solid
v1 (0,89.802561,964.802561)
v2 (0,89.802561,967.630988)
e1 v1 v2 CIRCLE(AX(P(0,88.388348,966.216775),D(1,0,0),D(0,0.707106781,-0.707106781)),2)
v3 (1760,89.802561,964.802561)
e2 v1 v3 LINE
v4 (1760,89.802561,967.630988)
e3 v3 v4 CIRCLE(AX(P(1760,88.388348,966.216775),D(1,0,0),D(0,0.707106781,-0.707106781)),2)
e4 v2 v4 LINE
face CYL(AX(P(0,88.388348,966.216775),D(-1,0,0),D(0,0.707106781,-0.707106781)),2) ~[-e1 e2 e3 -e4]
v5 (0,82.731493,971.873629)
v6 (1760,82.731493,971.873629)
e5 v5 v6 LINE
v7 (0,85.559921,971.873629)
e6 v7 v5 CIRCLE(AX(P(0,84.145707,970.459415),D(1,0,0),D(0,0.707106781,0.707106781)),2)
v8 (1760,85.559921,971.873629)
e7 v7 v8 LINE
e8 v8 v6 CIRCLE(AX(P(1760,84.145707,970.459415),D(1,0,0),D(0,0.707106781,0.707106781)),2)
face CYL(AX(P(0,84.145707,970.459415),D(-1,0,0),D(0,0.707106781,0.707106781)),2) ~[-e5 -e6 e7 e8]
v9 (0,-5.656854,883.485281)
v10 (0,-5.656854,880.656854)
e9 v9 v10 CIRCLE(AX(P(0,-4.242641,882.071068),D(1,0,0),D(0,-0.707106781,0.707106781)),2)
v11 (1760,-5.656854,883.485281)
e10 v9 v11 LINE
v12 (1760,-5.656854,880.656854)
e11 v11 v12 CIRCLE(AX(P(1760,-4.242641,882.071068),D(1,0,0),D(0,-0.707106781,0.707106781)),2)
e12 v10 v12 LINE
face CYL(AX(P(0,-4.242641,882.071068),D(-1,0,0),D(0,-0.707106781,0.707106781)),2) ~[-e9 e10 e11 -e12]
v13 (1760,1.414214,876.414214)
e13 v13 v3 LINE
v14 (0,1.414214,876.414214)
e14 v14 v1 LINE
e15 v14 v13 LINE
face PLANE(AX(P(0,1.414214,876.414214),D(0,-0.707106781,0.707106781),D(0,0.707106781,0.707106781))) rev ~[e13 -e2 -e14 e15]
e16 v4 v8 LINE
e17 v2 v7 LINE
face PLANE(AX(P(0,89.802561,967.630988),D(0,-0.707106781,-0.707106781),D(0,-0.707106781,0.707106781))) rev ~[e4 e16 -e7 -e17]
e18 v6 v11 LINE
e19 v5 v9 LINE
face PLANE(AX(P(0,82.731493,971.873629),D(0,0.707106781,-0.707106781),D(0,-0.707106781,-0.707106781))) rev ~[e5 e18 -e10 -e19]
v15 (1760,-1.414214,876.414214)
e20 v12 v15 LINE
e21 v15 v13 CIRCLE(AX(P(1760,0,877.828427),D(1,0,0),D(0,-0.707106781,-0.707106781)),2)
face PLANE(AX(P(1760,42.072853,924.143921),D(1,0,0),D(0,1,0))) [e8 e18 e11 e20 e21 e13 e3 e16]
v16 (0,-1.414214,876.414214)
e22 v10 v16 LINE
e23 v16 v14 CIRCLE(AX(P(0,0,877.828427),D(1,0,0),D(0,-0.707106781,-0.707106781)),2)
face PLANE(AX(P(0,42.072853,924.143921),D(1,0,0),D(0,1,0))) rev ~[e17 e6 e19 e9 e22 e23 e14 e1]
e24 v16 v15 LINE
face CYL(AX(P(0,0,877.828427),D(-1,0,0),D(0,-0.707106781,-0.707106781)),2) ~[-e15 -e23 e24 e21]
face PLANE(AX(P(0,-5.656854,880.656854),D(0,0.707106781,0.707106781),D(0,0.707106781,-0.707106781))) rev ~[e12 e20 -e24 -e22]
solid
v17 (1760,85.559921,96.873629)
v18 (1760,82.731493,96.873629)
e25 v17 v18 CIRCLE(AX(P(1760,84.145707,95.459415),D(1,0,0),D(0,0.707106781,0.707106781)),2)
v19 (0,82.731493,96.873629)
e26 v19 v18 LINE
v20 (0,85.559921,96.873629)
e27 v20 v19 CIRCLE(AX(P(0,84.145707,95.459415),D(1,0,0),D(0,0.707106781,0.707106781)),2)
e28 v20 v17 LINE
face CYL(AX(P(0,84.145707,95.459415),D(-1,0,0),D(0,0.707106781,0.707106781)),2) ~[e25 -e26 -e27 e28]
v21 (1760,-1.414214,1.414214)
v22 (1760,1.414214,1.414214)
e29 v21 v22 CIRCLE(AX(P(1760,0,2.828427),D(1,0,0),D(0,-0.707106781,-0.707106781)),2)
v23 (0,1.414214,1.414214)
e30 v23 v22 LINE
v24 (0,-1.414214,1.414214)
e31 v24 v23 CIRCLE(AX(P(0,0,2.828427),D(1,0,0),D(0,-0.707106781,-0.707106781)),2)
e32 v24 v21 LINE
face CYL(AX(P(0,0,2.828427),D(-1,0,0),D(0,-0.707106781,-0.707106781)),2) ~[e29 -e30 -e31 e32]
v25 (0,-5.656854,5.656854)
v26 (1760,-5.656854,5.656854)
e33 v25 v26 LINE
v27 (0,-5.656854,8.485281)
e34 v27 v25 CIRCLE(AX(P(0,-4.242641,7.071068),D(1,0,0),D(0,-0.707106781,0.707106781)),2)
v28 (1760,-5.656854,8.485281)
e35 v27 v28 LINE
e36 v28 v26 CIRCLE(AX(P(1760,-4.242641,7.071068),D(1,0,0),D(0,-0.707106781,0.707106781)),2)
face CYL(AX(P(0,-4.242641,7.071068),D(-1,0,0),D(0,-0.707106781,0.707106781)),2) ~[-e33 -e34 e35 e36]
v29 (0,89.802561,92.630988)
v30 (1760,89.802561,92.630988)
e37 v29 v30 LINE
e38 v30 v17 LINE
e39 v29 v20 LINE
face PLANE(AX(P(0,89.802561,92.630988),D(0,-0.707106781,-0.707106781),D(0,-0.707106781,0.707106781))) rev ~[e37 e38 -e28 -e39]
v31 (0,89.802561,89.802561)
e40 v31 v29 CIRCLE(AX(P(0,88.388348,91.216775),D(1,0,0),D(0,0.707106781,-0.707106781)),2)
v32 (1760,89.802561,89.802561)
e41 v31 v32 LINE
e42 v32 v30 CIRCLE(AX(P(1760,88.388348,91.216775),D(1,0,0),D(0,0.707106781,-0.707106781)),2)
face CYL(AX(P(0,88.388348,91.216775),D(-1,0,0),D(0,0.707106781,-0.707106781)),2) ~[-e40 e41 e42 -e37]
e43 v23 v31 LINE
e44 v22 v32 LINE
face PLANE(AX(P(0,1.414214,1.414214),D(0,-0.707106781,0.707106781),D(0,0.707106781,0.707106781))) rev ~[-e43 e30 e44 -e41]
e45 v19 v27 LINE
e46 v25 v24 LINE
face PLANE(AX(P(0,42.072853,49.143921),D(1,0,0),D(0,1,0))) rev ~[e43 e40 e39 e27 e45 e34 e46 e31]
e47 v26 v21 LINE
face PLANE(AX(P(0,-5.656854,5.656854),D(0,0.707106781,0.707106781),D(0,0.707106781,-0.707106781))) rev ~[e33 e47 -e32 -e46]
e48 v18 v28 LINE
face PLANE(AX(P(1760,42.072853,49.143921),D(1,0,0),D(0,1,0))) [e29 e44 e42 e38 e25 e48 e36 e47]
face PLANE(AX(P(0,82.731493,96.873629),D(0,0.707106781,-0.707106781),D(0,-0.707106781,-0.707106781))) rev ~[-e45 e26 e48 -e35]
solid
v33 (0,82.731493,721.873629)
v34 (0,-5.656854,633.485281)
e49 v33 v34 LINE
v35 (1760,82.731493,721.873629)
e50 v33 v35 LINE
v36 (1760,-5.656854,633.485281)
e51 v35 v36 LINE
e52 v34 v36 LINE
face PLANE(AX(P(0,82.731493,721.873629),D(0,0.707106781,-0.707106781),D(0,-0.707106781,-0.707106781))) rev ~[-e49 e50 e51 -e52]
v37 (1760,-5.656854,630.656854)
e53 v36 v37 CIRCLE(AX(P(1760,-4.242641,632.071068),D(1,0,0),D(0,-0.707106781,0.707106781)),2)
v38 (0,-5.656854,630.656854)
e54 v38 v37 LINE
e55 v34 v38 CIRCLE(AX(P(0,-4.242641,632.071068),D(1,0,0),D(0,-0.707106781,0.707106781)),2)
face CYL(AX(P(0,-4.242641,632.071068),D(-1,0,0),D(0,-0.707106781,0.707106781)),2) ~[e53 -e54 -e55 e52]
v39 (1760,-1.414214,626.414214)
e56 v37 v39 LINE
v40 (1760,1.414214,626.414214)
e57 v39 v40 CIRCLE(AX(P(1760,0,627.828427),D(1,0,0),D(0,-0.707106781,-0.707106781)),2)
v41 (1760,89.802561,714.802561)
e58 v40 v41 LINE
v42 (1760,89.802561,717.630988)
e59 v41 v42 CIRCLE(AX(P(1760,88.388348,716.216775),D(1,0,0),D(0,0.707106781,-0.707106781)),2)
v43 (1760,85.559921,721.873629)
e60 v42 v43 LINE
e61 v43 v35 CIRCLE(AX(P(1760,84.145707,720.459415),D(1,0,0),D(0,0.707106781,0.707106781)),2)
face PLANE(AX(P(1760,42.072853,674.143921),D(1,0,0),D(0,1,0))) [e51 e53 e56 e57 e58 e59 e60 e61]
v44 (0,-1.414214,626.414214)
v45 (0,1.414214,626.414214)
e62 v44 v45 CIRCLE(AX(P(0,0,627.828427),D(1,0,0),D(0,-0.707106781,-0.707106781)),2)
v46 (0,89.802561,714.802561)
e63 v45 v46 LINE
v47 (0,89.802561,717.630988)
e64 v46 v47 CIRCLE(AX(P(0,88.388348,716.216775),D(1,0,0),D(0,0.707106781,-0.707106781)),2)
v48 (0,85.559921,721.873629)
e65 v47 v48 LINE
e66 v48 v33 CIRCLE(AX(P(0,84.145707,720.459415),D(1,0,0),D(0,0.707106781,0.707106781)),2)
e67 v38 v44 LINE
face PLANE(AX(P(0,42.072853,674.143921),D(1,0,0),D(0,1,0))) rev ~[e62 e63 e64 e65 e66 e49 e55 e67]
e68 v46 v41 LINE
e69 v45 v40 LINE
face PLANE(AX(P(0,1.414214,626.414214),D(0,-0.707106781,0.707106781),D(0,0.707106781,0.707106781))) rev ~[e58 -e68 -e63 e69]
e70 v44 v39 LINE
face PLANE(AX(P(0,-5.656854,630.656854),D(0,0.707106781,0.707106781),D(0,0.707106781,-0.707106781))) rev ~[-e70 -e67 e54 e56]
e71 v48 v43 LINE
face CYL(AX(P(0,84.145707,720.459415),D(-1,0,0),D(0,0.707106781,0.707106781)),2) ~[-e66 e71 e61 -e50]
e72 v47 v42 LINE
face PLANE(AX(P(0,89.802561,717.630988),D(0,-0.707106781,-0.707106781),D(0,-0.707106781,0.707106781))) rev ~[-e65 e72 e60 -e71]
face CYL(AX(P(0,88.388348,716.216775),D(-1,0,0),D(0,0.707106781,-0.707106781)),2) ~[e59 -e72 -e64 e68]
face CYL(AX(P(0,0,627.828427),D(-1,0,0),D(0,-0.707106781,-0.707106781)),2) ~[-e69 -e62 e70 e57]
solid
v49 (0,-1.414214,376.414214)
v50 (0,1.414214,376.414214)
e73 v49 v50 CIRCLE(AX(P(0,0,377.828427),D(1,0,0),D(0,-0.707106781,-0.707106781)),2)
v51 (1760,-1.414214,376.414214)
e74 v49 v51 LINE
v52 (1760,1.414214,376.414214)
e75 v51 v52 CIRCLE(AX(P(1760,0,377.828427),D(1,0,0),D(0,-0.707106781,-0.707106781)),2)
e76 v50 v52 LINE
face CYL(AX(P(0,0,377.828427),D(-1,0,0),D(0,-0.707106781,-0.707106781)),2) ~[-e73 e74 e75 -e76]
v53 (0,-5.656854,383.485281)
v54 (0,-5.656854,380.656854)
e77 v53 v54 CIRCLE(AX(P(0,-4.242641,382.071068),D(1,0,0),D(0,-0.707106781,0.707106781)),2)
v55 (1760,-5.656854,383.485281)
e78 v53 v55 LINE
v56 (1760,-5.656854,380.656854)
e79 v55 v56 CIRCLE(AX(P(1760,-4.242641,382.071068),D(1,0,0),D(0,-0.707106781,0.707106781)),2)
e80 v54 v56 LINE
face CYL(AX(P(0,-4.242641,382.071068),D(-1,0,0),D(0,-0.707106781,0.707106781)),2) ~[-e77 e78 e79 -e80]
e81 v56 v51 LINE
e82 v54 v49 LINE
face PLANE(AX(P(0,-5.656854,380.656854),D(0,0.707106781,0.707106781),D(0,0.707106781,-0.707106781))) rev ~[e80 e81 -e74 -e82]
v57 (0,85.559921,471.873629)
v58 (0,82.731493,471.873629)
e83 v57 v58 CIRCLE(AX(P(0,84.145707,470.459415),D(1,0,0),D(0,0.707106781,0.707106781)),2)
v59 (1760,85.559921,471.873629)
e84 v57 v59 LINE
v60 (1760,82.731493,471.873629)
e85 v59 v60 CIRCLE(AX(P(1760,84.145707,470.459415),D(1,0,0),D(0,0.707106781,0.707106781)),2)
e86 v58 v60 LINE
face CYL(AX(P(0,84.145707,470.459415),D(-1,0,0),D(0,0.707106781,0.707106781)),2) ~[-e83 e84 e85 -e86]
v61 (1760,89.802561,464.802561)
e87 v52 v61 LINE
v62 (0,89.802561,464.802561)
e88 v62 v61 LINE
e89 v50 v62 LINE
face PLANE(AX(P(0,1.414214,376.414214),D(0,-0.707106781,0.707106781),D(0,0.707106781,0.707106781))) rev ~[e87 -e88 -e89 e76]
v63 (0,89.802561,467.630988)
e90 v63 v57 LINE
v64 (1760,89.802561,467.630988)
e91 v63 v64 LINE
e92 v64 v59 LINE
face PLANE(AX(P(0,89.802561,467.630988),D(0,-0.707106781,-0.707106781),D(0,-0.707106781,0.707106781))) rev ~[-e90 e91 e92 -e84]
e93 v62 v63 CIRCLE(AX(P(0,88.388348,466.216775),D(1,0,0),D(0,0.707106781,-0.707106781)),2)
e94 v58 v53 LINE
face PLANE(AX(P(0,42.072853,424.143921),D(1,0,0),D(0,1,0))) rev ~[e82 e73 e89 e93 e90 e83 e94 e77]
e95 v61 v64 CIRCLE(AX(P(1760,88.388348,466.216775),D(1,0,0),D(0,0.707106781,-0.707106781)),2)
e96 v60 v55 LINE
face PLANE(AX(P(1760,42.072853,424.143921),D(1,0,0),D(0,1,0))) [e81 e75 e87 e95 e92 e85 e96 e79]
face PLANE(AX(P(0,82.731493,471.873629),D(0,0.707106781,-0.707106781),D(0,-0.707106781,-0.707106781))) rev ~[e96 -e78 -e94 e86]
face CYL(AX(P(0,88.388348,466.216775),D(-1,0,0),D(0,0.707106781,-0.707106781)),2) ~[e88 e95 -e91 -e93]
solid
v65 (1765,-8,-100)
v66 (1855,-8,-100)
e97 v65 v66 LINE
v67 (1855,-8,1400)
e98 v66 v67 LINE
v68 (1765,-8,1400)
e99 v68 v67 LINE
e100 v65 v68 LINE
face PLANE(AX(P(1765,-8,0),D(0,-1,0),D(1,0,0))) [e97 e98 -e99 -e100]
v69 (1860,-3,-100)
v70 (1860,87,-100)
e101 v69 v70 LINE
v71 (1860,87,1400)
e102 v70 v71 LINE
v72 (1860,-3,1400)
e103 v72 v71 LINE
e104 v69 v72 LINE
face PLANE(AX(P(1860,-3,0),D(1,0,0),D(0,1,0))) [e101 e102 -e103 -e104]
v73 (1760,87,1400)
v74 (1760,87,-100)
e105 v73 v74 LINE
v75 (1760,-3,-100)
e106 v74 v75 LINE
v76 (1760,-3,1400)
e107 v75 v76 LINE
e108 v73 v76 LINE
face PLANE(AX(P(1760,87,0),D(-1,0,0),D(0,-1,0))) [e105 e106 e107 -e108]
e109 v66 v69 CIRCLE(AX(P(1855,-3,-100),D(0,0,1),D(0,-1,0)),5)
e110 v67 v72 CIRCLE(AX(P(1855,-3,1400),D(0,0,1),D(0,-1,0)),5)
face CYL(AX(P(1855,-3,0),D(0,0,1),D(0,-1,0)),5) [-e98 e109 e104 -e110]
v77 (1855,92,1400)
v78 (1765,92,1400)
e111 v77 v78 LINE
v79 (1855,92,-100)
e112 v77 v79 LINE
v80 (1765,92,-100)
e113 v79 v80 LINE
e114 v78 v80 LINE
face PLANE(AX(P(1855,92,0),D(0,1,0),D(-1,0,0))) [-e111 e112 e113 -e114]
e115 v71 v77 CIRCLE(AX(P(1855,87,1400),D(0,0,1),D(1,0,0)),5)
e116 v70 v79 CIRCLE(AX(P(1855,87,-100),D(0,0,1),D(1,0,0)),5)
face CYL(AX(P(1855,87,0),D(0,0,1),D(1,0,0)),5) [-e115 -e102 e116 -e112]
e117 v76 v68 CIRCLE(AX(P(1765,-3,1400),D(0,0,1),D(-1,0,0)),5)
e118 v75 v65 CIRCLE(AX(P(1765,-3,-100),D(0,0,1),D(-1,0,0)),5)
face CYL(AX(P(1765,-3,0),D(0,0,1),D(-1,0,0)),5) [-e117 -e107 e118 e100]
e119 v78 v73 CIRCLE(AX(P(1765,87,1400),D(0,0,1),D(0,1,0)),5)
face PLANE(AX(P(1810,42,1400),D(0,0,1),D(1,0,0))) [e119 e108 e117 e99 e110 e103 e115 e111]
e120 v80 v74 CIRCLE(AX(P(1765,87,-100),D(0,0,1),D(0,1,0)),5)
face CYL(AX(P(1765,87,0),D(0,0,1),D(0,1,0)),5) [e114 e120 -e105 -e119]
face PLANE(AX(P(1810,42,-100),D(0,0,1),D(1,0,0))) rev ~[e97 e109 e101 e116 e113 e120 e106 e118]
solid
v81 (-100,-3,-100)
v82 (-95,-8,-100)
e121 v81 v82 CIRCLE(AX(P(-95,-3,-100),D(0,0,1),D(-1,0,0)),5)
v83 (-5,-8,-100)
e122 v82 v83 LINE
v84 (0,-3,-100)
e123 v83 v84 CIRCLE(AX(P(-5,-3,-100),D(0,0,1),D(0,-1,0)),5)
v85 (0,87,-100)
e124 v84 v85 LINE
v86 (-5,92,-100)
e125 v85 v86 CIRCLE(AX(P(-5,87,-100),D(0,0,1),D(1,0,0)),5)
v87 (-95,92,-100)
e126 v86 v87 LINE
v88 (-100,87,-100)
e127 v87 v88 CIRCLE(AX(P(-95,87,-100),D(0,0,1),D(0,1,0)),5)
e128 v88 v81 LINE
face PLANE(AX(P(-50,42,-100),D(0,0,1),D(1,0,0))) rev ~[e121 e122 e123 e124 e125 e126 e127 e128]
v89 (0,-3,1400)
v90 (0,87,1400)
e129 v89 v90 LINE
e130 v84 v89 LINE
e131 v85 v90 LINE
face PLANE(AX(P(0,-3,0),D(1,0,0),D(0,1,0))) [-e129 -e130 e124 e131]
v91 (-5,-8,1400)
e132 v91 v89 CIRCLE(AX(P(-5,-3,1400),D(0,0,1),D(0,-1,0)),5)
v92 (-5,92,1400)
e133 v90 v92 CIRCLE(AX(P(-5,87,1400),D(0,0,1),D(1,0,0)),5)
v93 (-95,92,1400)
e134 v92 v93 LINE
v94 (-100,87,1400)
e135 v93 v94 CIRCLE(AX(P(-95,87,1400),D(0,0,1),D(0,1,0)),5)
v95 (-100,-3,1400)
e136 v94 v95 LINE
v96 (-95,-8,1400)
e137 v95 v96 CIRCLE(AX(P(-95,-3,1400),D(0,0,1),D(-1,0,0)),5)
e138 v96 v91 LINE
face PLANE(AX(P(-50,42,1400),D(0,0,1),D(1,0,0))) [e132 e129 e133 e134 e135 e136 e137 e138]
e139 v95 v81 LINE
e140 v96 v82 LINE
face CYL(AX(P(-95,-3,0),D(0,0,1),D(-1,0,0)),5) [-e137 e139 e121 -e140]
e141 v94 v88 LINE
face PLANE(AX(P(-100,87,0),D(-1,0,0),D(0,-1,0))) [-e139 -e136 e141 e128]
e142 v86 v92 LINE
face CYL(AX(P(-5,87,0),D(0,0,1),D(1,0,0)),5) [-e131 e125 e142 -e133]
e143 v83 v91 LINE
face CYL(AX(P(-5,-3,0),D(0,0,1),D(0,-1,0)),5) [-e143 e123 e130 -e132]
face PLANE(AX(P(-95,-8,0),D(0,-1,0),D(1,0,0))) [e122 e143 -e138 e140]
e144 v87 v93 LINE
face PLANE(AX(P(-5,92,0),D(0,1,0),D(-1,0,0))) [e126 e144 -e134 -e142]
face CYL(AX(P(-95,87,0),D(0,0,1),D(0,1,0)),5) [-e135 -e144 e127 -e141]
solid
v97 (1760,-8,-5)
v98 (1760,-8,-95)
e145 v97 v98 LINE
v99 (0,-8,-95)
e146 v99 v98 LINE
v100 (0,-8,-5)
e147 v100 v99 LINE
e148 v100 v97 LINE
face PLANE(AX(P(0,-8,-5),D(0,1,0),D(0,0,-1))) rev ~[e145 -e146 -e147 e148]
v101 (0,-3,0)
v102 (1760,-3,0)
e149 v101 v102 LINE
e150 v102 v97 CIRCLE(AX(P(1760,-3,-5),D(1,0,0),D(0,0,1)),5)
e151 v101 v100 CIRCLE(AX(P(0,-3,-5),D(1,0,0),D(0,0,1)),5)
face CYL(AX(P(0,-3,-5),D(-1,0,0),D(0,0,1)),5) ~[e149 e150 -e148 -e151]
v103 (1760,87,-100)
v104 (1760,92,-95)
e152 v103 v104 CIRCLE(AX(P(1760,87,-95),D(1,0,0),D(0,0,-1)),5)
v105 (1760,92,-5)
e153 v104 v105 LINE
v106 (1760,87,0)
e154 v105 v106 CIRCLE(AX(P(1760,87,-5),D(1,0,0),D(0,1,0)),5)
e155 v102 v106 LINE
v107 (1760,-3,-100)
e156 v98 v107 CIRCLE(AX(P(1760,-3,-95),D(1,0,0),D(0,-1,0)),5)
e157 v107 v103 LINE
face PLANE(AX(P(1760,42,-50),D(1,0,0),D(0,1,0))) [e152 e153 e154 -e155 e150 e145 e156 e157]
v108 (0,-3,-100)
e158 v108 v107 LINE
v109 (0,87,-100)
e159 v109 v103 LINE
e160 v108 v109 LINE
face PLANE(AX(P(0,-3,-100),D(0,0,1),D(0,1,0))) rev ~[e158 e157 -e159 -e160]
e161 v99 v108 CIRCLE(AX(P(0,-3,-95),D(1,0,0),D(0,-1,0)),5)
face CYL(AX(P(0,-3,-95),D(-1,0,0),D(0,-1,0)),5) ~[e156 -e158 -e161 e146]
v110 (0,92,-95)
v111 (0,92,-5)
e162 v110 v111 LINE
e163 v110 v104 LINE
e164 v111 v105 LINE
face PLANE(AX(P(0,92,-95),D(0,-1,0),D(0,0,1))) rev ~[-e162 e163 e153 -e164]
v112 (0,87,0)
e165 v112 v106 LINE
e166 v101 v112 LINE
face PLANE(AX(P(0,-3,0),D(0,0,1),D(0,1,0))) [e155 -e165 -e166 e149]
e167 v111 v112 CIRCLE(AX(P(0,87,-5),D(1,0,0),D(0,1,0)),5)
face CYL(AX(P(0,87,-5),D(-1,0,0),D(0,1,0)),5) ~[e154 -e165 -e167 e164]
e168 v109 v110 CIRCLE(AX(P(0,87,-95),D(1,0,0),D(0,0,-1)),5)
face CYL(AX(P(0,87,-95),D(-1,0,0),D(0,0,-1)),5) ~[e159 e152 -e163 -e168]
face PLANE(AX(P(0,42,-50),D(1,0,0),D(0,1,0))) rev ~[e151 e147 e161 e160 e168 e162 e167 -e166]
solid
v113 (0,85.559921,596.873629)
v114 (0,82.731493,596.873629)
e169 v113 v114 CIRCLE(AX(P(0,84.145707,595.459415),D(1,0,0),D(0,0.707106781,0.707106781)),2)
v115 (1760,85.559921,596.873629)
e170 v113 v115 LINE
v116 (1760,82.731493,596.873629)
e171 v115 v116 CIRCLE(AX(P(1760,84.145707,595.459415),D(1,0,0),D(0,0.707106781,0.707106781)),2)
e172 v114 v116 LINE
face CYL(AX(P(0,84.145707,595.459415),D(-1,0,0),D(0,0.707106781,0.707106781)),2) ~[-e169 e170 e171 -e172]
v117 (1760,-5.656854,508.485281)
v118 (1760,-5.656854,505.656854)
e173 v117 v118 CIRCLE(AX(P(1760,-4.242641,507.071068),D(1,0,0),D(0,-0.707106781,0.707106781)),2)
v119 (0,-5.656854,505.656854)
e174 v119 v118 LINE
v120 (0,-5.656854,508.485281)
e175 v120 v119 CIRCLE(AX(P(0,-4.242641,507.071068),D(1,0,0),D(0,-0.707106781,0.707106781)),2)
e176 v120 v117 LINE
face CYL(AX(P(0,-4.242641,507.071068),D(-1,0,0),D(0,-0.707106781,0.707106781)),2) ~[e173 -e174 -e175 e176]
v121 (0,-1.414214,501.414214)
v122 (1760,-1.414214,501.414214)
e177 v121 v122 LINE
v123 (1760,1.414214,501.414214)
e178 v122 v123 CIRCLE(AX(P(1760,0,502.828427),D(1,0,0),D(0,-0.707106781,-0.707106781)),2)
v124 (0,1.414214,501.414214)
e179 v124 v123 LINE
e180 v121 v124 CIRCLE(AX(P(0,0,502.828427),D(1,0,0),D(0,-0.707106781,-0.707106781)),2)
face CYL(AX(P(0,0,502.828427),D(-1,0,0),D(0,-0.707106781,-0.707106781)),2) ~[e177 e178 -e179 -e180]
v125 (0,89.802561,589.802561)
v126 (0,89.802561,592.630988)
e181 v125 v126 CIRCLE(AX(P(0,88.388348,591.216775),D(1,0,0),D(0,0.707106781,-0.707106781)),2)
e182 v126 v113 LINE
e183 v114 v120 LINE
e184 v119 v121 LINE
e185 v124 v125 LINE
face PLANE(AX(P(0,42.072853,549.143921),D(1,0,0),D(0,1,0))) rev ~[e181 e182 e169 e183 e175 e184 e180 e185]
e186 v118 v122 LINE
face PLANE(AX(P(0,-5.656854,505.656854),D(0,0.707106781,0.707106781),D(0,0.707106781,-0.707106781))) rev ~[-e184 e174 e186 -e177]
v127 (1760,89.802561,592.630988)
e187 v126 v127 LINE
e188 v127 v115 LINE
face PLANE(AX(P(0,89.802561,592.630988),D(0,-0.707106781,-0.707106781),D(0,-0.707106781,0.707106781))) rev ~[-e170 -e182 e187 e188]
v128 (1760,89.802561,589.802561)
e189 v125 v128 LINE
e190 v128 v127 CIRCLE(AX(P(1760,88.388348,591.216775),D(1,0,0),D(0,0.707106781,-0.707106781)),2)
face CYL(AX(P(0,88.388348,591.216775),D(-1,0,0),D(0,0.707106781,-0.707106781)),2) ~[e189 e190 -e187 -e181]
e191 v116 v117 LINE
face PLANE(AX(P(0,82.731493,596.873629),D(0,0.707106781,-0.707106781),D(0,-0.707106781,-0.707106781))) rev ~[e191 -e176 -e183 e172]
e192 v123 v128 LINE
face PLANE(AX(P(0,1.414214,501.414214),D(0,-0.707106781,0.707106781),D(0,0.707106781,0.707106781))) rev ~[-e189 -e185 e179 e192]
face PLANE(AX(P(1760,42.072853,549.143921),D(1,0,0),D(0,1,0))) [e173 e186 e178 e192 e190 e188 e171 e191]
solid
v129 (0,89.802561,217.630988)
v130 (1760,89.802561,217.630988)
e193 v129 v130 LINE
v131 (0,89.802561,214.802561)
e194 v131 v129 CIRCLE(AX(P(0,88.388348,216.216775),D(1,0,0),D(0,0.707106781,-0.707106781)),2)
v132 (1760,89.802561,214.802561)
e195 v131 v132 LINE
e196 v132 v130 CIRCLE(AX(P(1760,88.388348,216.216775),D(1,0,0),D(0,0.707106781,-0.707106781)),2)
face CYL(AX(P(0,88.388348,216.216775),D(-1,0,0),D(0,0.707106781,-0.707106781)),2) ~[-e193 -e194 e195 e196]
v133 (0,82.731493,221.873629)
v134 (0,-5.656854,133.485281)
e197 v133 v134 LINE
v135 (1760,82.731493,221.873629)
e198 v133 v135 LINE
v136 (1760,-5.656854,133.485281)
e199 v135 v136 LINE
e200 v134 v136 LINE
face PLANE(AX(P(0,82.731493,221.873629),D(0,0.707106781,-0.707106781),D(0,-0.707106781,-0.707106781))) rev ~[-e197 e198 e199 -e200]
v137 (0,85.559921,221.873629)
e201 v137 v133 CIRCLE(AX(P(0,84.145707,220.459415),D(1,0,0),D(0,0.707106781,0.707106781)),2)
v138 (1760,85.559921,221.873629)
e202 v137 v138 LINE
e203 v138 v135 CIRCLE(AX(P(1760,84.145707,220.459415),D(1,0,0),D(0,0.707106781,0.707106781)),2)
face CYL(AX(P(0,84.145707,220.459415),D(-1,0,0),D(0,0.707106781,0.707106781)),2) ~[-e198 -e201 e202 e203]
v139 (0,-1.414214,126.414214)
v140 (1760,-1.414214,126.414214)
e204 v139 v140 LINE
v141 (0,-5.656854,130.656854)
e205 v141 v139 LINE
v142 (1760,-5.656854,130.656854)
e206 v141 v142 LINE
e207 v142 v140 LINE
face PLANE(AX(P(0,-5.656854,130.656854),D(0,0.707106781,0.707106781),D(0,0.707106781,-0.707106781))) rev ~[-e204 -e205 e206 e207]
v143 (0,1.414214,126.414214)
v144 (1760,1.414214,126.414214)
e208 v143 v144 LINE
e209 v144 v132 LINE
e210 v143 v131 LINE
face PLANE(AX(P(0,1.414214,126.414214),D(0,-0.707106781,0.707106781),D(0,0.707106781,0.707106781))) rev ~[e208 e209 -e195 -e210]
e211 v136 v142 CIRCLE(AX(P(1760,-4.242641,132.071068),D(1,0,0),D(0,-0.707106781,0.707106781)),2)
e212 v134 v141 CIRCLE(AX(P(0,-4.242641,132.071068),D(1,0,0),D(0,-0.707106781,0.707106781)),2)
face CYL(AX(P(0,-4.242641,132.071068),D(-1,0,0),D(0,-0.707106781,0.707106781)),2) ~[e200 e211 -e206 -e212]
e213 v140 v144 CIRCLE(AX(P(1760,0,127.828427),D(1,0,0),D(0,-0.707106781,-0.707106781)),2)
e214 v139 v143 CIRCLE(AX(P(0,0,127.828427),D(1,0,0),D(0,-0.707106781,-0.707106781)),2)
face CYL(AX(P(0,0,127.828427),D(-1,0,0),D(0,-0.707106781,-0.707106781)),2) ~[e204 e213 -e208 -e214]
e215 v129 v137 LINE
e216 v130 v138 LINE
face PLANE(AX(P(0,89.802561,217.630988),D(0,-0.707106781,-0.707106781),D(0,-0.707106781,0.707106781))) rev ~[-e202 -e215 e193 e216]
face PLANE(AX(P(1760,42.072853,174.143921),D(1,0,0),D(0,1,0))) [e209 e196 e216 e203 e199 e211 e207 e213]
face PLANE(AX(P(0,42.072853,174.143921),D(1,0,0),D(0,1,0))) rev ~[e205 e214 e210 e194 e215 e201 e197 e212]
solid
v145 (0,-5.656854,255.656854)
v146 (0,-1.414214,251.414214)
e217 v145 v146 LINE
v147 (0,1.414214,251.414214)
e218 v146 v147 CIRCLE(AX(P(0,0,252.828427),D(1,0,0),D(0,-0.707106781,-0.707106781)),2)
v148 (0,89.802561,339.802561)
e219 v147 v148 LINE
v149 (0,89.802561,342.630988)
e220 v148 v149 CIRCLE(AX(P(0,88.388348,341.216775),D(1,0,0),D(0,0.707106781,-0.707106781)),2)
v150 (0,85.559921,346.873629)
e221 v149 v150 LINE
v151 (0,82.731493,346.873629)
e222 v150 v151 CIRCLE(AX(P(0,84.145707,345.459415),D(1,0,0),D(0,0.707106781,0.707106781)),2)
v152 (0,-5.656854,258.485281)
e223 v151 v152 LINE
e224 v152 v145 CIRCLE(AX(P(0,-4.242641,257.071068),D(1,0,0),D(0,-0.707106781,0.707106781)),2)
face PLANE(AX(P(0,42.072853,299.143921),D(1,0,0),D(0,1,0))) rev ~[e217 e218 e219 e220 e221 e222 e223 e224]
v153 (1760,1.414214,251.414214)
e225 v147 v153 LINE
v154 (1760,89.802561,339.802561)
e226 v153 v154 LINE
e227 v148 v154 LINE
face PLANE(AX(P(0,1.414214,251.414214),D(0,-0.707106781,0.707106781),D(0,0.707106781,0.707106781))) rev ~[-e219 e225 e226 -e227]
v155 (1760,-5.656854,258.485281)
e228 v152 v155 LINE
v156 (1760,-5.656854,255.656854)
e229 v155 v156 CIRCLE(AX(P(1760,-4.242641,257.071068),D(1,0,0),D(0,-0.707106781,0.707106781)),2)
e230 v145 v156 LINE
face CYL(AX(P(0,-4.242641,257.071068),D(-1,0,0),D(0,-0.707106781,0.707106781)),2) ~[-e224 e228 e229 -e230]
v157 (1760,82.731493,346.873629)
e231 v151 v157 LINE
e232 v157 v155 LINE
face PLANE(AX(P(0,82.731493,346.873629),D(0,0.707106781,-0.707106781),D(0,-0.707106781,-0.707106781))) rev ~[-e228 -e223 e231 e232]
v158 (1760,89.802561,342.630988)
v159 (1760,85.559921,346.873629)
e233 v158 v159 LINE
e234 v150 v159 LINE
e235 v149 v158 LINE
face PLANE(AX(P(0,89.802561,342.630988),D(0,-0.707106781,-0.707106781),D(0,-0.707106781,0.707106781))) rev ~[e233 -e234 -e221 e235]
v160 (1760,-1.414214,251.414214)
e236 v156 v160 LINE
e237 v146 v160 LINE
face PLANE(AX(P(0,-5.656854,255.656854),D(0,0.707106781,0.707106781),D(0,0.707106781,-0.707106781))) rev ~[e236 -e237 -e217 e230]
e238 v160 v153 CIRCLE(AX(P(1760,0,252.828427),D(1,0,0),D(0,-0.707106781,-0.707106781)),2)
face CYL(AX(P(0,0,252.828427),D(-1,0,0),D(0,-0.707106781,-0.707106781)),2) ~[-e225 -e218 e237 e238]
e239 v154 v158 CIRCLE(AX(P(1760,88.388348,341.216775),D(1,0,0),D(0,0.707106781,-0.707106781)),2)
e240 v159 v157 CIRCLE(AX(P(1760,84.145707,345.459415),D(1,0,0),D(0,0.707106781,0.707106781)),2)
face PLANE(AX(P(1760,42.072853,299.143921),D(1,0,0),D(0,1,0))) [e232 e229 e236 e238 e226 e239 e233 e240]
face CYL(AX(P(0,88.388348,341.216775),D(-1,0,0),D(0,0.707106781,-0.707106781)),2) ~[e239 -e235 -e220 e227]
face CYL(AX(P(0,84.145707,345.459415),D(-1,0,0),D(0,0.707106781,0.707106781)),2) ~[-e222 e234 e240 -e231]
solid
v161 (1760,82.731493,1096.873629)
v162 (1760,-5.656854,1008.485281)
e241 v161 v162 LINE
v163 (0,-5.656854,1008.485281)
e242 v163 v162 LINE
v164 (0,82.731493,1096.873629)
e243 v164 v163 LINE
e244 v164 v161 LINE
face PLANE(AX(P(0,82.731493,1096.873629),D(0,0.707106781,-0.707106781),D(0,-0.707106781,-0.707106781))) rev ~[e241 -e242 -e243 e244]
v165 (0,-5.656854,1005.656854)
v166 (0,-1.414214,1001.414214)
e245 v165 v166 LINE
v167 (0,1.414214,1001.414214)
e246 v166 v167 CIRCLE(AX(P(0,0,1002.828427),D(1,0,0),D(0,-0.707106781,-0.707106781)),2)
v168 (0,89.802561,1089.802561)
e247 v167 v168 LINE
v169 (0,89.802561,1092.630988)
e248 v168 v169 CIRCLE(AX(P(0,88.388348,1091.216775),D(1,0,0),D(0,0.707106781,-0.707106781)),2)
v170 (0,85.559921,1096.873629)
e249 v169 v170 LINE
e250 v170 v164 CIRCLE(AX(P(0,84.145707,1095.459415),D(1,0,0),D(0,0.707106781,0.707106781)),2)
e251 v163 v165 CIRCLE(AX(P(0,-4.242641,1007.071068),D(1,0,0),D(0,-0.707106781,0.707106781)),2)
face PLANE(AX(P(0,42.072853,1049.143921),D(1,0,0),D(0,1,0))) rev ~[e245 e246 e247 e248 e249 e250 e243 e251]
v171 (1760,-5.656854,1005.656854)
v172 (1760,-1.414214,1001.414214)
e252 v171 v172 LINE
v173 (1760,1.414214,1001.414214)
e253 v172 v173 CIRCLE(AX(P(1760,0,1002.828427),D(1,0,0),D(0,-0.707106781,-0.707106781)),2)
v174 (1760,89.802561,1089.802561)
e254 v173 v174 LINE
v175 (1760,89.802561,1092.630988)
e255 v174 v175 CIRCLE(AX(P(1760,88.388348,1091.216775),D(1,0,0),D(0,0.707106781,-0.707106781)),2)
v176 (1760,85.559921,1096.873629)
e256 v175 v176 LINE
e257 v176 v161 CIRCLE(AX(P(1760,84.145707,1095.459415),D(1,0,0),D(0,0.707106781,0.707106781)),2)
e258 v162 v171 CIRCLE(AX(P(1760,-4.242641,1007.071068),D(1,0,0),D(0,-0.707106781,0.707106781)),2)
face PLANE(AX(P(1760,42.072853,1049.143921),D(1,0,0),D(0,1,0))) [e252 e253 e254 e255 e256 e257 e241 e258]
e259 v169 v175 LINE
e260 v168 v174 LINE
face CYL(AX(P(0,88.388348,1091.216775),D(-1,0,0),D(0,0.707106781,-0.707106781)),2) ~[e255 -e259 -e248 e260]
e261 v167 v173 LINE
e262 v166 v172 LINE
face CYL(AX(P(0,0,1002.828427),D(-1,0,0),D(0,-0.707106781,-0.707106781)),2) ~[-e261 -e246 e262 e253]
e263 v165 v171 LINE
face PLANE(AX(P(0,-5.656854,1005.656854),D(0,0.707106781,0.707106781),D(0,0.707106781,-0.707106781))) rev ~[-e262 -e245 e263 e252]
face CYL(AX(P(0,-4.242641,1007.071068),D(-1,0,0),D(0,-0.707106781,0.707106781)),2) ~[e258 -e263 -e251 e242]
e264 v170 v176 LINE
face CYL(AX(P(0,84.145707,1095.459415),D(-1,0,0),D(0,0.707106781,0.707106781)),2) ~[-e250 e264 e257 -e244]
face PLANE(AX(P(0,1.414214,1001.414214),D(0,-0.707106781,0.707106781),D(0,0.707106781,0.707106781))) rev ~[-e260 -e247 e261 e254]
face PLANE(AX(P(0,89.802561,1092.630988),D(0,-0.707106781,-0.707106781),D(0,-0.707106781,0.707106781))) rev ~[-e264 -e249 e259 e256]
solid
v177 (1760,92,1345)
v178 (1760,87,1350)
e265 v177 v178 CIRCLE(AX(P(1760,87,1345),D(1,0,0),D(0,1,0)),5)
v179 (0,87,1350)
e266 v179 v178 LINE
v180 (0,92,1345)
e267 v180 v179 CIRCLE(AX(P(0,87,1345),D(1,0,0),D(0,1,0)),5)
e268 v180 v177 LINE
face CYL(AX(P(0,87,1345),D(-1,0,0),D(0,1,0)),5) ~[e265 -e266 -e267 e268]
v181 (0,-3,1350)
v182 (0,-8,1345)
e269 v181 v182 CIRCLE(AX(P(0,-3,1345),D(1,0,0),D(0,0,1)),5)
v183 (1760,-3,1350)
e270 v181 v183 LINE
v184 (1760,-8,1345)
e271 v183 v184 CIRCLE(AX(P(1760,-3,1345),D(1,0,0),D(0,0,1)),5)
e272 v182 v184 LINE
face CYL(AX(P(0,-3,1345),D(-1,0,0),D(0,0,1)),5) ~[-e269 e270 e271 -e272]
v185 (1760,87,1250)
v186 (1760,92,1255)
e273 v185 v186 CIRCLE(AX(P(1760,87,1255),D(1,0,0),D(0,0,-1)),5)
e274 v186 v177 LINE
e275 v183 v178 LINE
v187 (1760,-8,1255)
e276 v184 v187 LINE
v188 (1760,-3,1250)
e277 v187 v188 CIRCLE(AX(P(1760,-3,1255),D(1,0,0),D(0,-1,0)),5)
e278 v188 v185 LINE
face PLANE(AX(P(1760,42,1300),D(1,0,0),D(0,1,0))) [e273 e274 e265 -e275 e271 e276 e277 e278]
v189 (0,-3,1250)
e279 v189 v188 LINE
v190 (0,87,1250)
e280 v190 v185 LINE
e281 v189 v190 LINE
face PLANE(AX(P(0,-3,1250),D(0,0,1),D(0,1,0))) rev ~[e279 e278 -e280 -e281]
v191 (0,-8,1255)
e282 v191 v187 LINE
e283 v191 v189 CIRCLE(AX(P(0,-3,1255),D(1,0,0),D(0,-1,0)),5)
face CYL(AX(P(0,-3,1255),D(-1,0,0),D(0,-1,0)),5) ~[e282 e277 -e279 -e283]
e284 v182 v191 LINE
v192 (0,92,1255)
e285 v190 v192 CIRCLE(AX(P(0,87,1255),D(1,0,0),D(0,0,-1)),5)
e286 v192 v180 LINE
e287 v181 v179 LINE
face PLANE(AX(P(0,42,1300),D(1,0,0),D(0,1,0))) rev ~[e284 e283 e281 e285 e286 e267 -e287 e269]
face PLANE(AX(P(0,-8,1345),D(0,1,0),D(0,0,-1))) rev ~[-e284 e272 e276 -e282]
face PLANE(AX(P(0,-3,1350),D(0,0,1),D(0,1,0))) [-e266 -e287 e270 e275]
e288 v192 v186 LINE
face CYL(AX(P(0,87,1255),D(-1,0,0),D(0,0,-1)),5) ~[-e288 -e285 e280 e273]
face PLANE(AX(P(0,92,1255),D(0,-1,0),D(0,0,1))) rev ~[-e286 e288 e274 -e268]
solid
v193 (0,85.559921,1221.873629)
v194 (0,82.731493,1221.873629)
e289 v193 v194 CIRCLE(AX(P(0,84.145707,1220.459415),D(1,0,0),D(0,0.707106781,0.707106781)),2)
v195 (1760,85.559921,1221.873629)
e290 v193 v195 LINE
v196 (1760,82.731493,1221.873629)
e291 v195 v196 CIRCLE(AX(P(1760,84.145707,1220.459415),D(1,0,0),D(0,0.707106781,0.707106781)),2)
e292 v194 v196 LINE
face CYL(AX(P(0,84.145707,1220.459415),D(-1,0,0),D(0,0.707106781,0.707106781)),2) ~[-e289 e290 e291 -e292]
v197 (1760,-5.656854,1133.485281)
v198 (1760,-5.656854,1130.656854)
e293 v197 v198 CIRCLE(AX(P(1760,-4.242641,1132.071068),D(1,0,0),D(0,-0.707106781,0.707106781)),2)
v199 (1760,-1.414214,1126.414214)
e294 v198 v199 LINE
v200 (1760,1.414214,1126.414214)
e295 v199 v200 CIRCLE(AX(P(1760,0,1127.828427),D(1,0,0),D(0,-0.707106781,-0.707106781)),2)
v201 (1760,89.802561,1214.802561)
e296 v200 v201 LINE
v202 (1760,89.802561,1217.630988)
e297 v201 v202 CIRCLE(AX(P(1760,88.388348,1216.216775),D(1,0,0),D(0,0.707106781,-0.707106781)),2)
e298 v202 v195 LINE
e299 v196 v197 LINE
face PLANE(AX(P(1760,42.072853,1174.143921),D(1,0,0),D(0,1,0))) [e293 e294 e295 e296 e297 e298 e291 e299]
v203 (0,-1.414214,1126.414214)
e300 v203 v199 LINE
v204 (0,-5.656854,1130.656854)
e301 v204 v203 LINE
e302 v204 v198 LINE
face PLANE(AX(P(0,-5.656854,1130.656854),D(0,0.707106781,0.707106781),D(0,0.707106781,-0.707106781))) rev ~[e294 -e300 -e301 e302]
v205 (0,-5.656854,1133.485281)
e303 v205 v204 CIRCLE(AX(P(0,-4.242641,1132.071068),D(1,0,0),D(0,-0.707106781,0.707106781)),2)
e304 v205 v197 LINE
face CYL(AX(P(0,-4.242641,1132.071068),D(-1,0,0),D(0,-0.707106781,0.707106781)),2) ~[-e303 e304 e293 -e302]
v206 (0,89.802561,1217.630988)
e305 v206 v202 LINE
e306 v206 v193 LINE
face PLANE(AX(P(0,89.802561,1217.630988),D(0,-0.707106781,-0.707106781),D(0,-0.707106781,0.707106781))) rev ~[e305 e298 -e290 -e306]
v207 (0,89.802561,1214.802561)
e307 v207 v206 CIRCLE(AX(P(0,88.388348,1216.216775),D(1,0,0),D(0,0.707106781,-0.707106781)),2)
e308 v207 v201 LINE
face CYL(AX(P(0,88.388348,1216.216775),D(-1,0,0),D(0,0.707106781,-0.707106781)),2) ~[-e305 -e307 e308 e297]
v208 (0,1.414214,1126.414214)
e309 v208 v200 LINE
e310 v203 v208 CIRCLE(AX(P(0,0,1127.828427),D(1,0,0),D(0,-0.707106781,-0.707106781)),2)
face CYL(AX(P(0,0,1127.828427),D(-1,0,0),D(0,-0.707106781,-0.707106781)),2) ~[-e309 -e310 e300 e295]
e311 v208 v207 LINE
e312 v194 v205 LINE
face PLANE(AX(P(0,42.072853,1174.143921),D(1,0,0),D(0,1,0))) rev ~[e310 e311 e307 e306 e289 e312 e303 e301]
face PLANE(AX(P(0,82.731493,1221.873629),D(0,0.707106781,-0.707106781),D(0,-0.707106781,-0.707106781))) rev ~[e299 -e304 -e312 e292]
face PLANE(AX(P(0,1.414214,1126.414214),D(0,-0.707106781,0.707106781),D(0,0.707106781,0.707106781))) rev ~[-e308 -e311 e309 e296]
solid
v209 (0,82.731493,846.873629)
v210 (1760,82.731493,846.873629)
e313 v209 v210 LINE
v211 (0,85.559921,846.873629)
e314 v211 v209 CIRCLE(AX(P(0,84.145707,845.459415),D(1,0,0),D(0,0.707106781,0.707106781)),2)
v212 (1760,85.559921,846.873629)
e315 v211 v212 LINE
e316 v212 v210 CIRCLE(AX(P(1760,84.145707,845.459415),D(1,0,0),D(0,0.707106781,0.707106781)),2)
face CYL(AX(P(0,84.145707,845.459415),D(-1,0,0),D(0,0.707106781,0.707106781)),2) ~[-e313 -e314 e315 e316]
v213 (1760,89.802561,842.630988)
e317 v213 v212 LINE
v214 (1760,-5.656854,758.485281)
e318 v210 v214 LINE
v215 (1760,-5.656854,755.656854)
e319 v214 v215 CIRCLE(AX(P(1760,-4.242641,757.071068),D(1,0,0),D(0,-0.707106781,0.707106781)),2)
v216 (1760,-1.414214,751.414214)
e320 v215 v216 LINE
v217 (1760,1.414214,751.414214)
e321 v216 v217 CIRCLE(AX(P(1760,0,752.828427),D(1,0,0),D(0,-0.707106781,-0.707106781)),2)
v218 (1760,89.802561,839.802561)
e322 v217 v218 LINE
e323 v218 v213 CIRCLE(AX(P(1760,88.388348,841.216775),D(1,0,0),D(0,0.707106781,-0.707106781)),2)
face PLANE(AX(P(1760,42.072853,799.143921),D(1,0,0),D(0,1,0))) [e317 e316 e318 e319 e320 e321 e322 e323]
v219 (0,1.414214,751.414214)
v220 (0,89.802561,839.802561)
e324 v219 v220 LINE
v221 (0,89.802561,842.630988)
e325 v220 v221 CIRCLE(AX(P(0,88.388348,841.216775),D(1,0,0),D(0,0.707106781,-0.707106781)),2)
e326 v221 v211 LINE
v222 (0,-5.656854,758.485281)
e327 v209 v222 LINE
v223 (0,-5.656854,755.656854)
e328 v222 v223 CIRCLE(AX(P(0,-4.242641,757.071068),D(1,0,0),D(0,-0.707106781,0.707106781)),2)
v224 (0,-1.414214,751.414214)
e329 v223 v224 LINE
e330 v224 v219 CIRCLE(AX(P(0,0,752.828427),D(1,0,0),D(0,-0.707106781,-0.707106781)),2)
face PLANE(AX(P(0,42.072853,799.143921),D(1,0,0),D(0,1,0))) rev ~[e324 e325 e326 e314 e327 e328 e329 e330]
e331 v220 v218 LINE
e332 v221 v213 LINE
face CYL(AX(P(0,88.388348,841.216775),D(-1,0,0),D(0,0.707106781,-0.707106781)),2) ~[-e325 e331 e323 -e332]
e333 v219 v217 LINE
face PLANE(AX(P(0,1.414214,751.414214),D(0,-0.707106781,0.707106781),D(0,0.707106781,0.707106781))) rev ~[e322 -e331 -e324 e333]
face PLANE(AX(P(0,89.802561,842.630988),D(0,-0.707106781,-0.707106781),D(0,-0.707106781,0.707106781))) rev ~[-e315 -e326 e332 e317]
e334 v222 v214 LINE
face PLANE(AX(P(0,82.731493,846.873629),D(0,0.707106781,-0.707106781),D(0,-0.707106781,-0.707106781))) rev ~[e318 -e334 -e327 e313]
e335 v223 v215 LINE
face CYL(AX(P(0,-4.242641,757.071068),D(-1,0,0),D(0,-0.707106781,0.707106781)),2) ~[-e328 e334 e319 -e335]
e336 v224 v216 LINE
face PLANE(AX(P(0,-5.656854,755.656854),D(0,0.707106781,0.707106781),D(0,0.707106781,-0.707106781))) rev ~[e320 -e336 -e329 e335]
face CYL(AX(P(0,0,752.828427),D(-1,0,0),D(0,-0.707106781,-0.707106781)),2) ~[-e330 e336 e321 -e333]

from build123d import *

# Parameters (mm, degrees)
F1_DEPTH      = 1760
F3_DEPTH      = 1400
F3_DEPTH_BACK = 100
F4_W          = 90
F4_H          = 100
F5_DEPTH      = 1760


# Not quite as in the source:
# - a feature names something its author has since deleted; it is built from what else it names


with BuildPart() as f1:
    # F0 (on Right) → F1 (new body)
    with BuildSketch(Plane.YZ):
        with BuildLine():
            ThreePointArc((-1.4142135624, 1.4142135624), (0, 0.8284271247), (1.4142135624, 1.4142135624))
            Line((1.4142135624, 1.4142135624), (89.8025612107, 89.8025612107))
            ThreePointArc((89.8025612107, 89.8025612107), (90.3883476483, 91.2167747731), (89.8025612107, 92.6309883354))
            Line((89.8025612107, 92.6309883354), (85.5599205236, 96.8736290226))
            ThreePointArc((85.5599205236, 96.8736290226), (84.1457069612, 97.4594154602), (82.7314933988, 96.8736290226))
            Line((82.7314933988, 96.8736290226), (-5.6568542495, 8.4852813742))
            ThreePointArc((-5.6568542495, 8.4852813742), (-6.2426406871, 7.0710678119), (-5.6568542495, 5.6568542495))
            Line((-5.6568542495, 5.6568542495), (-1.4142135624, 1.4142135624))
        make_face()
    extrude(amount=F1_DEPTH)


with BuildPart() as f1b:
    # F0 (on Right) → F1, piece 2 (new body)
    with BuildSketch(Plane.YZ):
        with BuildLine():
            ThreePointArc((-1.4142135624, 126.4142135624), (0, 125.8284271247), (1.4142135624, 126.4142135624))
            Line((1.4142135624, 126.4142135624), (89.8025612107, 214.8025612107))
            ThreePointArc((89.8025612107, 214.8025612107), (90.3883476483, 216.2167747731), (89.8025612107, 217.6309883354))
            Line((89.8025612107, 217.6309883354), (85.5599205236, 221.8736290226))
            ThreePointArc((85.5599205236, 221.8736290226), (84.1457069612, 222.4594154602), (82.7314933988, 221.8736290226))
            Line((82.7314933988, 221.8736290226), (-5.6568542495, 133.4852813742))
            ThreePointArc((-5.6568542495, 133.4852813742), (-6.2426406871, 132.0710678119), (-5.6568542495, 130.6568542495))
            Line((-5.6568542495, 130.6568542495), (-1.4142135624, 126.4142135624))
        make_face()
    extrude(amount=F1_DEPTH)


with BuildPart() as f1c:
    # F0 (on Right) → F1, piece 3 (new body)
    with BuildSketch(Plane.YZ):
        with BuildLine():
            ThreePointArc((-1.4142135624, 251.4142135624), (0, 250.8284271247), (1.4142135624, 251.4142135624))
            Line((1.4142135624, 251.4142135624), (89.8025612107, 339.8025612107))
            ThreePointArc((89.8025612107, 339.8025612107), (90.3883476483, 341.2167747731), (89.8025612107, 342.6309883354))
            Line((89.8025612107, 342.6309883354), (85.5599205236, 346.8736290226))
            ThreePointArc((85.5599205236, 346.8736290226), (84.1457069612, 347.4594154602), (82.7314933988, 346.8736290226))
            Line((82.7314933988, 346.8736290226), (-5.6568542495, 258.4852813742))
            ThreePointArc((-5.6568542495, 258.4852813742), (-6.2426406871, 257.0710678119), (-5.6568542495, 255.6568542495))
            Line((-5.6568542495, 255.6568542495), (-1.4142135624, 251.4142135624))
        make_face()
    extrude(amount=F1_DEPTH)


with BuildPart() as f1d:
    # F0 (on Right) → F1, piece 4 (new body)
    with BuildSketch(Plane.YZ):
        with BuildLine():
            ThreePointArc((-1.4142135624, 376.4142135624), (0, 375.8284271247), (1.4142135624, 376.4142135624))
            Line((1.4142135624, 376.4142135624), (89.8025612107, 464.8025612107))
            ThreePointArc((89.8025612107, 464.8025612107), (90.3883476483, 466.2167747731), (89.8025612107, 467.6309883354))
            Line((89.8025612107, 467.6309883354), (85.5599205236, 471.8736290226))
            ThreePointArc((85.5599205236, 471.8736290226), (84.1457069612, 472.4594154602), (82.7314933988, 471.8736290226))
            Line((82.7314933988, 471.8736290226), (-5.6568542495, 383.4852813742))
            ThreePointArc((-5.6568542495, 383.4852813742), (-6.2426406871, 382.0710678119), (-5.6568542495, 380.6568542495))
            Line((-5.6568542495, 380.6568542495), (-1.4142135624, 376.4142135624))
        make_face()
    extrude(amount=F1_DEPTH)


with BuildPart() as f1e:
    # F0 (on Right) → F1, piece 5 (new body)
    with BuildSketch(Plane.YZ):
        with BuildLine():
            ThreePointArc((-1.4142135624, 501.4142135624), (0, 500.8284271247), (1.4142135624, 501.4142135624))
            Line((1.4142135624, 501.4142135624), (89.8025612107, 589.8025612107))
            ThreePointArc((89.8025612107, 589.8025612107), (90.3883476483, 591.2167747731), (89.8025612107, 592.6309883354))
            Line((89.8025612107, 592.6309883354), (85.5599205236, 596.8736290226))
            ThreePointArc((85.5599205236, 596.8736290226), (84.1457069612, 597.4594154602), (82.7314933988, 596.8736290226))
            Line((82.7314933988, 596.8736290226), (-5.6568542495, 508.4852813742))
            ThreePointArc((-5.6568542495, 508.4852813742), (-6.2426406871, 507.0710678119), (-5.6568542495, 505.6568542495))
            Line((-5.6568542495, 505.6568542495), (-1.4142135624, 501.4142135624))
        make_face()
    extrude(amount=F1_DEPTH)


with BuildPart() as f1f:
    # F0 (on Right) → F1, piece 6 (new body)
    with BuildSketch(Plane.YZ):
        with BuildLine():
            ThreePointArc((-1.4142135624, 626.4142135624), (0, 625.8284271247), (1.4142135624, 626.4142135624))
            Line((1.4142135624, 626.4142135624), (89.8025612107, 714.8025612107))
            ThreePointArc((89.8025612107, 714.8025612107), (90.3883476483, 716.2167747731), (89.8025612107, 717.6309883354))
            Line((89.8025612107, 717.6309883354), (85.5599205236, 721.8736290226))
            ThreePointArc((85.5599205236, 721.8736290226), (84.1457069612, 722.4594154602), (82.7314933988, 721.8736290226))
            Line((82.7314933988, 721.8736290226), (-5.6568542495, 633.4852813742))
            ThreePointArc((-5.6568542495, 633.4852813742), (-6.2426406871, 632.0710678119), (-5.6568542495, 630.6568542495))
            Line((-5.6568542495, 630.6568542495), (-1.4142135624, 626.4142135624))
        make_face()
    extrude(amount=F1_DEPTH)


with BuildPart() as f1g:
    # F0 (on Right) → F1, piece 7 (new body)
    with BuildSketch(Plane.YZ):
        with BuildLine():
            ThreePointArc((-1.4142135624, 751.4142135624), (0, 750.8284271247), (1.4142135624, 751.4142135624))
            Line((1.4142135624, 751.4142135624), (89.8025612107, 839.8025612107))
            ThreePointArc((89.8025612107, 839.8025612107), (90.3883476483, 841.2167747731), (89.8025612107, 842.6309883354))
            Line((89.8025612107, 842.6309883354), (85.5599205236, 846.8736290226))
            ThreePointArc((85.5599205236, 846.8736290226), (84.1457069612, 847.4594154602), (82.7314933988, 846.8736290226))
            Line((82.7314933988, 846.8736290226), (-5.6568542495, 758.4852813742))
            ThreePointArc((-5.6568542495, 758.4852813742), (-6.2426406871, 757.0710678119), (-5.6568542495, 755.6568542495))
            Line((-5.6568542495, 755.6568542495), (-1.4142135624, 751.4142135624))
        make_face()
    extrude(amount=F1_DEPTH)


with BuildPart() as f1h:
    # F0 (on Right) → F1, piece 8 (new body)
    with BuildSketch(Plane.YZ):
        with BuildLine():
            ThreePointArc((-1.4142135624, 876.4142135624), (0, 875.8284271247), (1.4142135624, 876.4142135624))
            Line((1.4142135624, 876.4142135624), (89.8025612107, 964.8025612107))
            ThreePointArc((89.8025612107, 964.8025612107), (90.3883476483, 966.2167747731), (89.8025612107, 967.6309883354))
            Line((89.8025612107, 967.6309883354), (85.5599205236, 971.8736290226))
            ThreePointArc((85.5599205236, 971.8736290226), (84.1457069612, 972.4594154602), (82.7314933988, 971.8736290226))
            Line((82.7314933988, 971.8736290226), (-5.6568542495, 883.4852813742))
            ThreePointArc((-5.6568542495, 883.4852813742), (-6.2426406871, 882.0710678119), (-5.6568542495, 880.6568542495))
            Line((-5.6568542495, 880.6568542495), (-1.4142135624, 876.4142135624))
        make_face()
    extrude(amount=F1_DEPTH)


with BuildPart() as f1i:
    # F0 (on Right) → F1, piece 9 (new body)
    with BuildSketch(Plane.YZ):
        with BuildLine():
            ThreePointArc((-1.4142135624, 1001.4142135624), (0, 1000.8284271247), (1.4142135624, 1001.4142135624))
            Line((1.4142135624, 1001.4142135624), (89.8025612107, 1089.8025612107))
            ThreePointArc((89.8025612107, 1089.8025612107), (90.3883476483, 1091.2167747731), (89.8025612107, 1092.6309883354))
            Line((89.8025612107, 1092.6309883354), (85.5599205236, 1096.8736290226))
            ThreePointArc((85.5599205236, 1096.8736290226), (84.1457069612, 1097.4594154602), (82.7314933988, 1096.8736290226))
            Line((82.7314933988, 1096.8736290226), (-5.6568542495, 1008.4852813742))
            ThreePointArc((-5.6568542495, 1008.4852813742), (-6.2426406871, 1007.0710678119), (-5.6568542495, 1005.6568542495))
            Line((-5.6568542495, 1005.6568542495), (-1.4142135624, 1001.4142135624))
        make_face()
    extrude(amount=F1_DEPTH)


with BuildPart() as f1j:
    # F0 (on Right) → F1, piece 10 (new body)
    with BuildSketch(Plane.YZ):
        with BuildLine():
            ThreePointArc((-1.4142135624, 1126.4142135624), (0, 1125.8284271247), (1.4142135624, 1126.4142135624))
            Line((1.4142135624, 1126.4142135624), (89.8025612107, 1214.8025612107))
            ThreePointArc((89.8025612107, 1214.8025612107), (90.3883476483, 1216.2167747731), (89.8025612107, 1217.6309883354))
            Line((89.8025612107, 1217.6309883354), (85.5599205236, 1221.8736290226))
            ThreePointArc((85.5599205236, 1221.8736290226), (84.1457069612, 1222.4594154602), (82.7314933988, 1221.8736290226))
            Line((82.7314933988, 1221.8736290226), (-5.6568542495, 1133.4852813742))
            ThreePointArc((-5.6568542495, 1133.4852813742), (-6.2426406871, 1132.0710678119), (-5.6568542495, 1130.6568542495))
            Line((-5.6568542495, 1130.6568542495), (-1.4142135624, 1126.4142135624))
        make_face()
    extrude(amount=F1_DEPTH)


with BuildPart() as f3:
    # F2 (on Top) → F3 (new body, two sides)
    with BuildSketch(Plane.XY) as f3_sk:
        with BuildLine():
            Line((-95, -8), (-5, -8))
            ThreePointArc((-5, -8), (-1.4644660941, -6.5355339059), (0, -3))
            Line((0, -3), (0, 87))
            ThreePointArc((0, 87), (-1.4644660941, 90.5355339059), (-5, 92))
            Line((-5, 92), (-95, 92))
            ThreePointArc((-95, 92), (-98.5355339059, 90.5355339059), (-100, 87))
            Line((-100, 87), (-100, -3))
            ThreePointArc((-100, -3), (-98.5355339059, -6.5355339059), (-95, -8))
        make_face()
    extrude(amount=F3_DEPTH)
    extrude(f3_sk.sketch, amount=-F3_DEPTH_BACK)


with BuildPart() as f3b:
    # F2 (on Top) → F3, piece 2 (new body, two sides)
    with BuildSketch(Plane.XY) as f3_2_sk:
        with BuildLine():
            Line((1760, 87), (1760, -3))
            ThreePointArc((1760, -3), (1761.4644660941, -6.5355339059), (1765, -8))
            Line((1765, -8), (1855, -8))
            ThreePointArc((1855, -8), (1858.5355339059, -6.5355339059), (1860, -3))
            Line((1860, -3), (1860, 87))
            ThreePointArc((1860, 87), (1858.5355339059, 90.5355339059), (1855, 92))
            Line((1855, 92), (1765, 92))
            ThreePointArc((1765, 92), (1761.4644660941, 90.5355339059), (1760, 87))
        make_face()
    extrude(amount=F3_DEPTH)
    extrude(f3_2_sk.sketch, amount=-F3_DEPTH_BACK)


with BuildPart() as f5:
    # F4 (on face) → F5 (new body)
    with BuildSketch(Plane.YZ):
        with Locations((42, 1300)):
            Rectangle(F4_W, F4_H)
        with BuildLine():
            ThreePointArc((-8, 1255), (-6.5355339059, 1251.4644660941), (-3, 1250))
            Line((-3, 1250), (-3, 1350))
            ThreePointArc((-3, 1350), (-6.5355339059, 1348.5355339059), (-8, 1345))
            Line((-8, 1345), (-8, 1255))
        make_face()
        with BuildLine():
            Line((87, 1350), (87, 1250))
            ThreePointArc((87, 1250), (90.5355339059, 1251.4644660941), (92, 1255))
            Line((92, 1255), (92, 1345))
            ThreePointArc((92, 1345), (90.5355339059, 1348.5355339059), (87, 1350))
        make_face()
    extrude(amount=F5_DEPTH)


with BuildPart() as f5b:
    # F4 (on face) → F5, piece 2 (new body)
    with BuildSketch(Plane.YZ):
        with Locations((42, -50)):
            Rectangle(F4_W, F4_H)
        with BuildLine():
            ThreePointArc((-8, -95), (-6.5355339059, -98.5355339059), (-3, -100))
            Line((-3, -100), (-3, 0))
            ThreePointArc((-3, 0), (-6.5355339059, -1.4644660941), (-8, -5))
            Line((-8, -5), (-8, -95))
        make_face()
        with BuildLine():
            Line((87, 0), (87, -100))
            ThreePointArc((87, -100), (90.5355339059, -98.5355339059), (92, -95))
            Line((92, -95), (92, -5))
            ThreePointArc((92, -5), (90.5355339059, -1.4644660941), (87, 0))
        make_face()
    extrude(amount=F5_DEPTH)


solid = Compound([f1.part, f1b.part, f1c.part, f1d.part, f1e.part, f1f.part, f1g.part, f1h.part, f1i.part, f1j.part, f3.part, f3b.part, f5.part, f5b.part])
